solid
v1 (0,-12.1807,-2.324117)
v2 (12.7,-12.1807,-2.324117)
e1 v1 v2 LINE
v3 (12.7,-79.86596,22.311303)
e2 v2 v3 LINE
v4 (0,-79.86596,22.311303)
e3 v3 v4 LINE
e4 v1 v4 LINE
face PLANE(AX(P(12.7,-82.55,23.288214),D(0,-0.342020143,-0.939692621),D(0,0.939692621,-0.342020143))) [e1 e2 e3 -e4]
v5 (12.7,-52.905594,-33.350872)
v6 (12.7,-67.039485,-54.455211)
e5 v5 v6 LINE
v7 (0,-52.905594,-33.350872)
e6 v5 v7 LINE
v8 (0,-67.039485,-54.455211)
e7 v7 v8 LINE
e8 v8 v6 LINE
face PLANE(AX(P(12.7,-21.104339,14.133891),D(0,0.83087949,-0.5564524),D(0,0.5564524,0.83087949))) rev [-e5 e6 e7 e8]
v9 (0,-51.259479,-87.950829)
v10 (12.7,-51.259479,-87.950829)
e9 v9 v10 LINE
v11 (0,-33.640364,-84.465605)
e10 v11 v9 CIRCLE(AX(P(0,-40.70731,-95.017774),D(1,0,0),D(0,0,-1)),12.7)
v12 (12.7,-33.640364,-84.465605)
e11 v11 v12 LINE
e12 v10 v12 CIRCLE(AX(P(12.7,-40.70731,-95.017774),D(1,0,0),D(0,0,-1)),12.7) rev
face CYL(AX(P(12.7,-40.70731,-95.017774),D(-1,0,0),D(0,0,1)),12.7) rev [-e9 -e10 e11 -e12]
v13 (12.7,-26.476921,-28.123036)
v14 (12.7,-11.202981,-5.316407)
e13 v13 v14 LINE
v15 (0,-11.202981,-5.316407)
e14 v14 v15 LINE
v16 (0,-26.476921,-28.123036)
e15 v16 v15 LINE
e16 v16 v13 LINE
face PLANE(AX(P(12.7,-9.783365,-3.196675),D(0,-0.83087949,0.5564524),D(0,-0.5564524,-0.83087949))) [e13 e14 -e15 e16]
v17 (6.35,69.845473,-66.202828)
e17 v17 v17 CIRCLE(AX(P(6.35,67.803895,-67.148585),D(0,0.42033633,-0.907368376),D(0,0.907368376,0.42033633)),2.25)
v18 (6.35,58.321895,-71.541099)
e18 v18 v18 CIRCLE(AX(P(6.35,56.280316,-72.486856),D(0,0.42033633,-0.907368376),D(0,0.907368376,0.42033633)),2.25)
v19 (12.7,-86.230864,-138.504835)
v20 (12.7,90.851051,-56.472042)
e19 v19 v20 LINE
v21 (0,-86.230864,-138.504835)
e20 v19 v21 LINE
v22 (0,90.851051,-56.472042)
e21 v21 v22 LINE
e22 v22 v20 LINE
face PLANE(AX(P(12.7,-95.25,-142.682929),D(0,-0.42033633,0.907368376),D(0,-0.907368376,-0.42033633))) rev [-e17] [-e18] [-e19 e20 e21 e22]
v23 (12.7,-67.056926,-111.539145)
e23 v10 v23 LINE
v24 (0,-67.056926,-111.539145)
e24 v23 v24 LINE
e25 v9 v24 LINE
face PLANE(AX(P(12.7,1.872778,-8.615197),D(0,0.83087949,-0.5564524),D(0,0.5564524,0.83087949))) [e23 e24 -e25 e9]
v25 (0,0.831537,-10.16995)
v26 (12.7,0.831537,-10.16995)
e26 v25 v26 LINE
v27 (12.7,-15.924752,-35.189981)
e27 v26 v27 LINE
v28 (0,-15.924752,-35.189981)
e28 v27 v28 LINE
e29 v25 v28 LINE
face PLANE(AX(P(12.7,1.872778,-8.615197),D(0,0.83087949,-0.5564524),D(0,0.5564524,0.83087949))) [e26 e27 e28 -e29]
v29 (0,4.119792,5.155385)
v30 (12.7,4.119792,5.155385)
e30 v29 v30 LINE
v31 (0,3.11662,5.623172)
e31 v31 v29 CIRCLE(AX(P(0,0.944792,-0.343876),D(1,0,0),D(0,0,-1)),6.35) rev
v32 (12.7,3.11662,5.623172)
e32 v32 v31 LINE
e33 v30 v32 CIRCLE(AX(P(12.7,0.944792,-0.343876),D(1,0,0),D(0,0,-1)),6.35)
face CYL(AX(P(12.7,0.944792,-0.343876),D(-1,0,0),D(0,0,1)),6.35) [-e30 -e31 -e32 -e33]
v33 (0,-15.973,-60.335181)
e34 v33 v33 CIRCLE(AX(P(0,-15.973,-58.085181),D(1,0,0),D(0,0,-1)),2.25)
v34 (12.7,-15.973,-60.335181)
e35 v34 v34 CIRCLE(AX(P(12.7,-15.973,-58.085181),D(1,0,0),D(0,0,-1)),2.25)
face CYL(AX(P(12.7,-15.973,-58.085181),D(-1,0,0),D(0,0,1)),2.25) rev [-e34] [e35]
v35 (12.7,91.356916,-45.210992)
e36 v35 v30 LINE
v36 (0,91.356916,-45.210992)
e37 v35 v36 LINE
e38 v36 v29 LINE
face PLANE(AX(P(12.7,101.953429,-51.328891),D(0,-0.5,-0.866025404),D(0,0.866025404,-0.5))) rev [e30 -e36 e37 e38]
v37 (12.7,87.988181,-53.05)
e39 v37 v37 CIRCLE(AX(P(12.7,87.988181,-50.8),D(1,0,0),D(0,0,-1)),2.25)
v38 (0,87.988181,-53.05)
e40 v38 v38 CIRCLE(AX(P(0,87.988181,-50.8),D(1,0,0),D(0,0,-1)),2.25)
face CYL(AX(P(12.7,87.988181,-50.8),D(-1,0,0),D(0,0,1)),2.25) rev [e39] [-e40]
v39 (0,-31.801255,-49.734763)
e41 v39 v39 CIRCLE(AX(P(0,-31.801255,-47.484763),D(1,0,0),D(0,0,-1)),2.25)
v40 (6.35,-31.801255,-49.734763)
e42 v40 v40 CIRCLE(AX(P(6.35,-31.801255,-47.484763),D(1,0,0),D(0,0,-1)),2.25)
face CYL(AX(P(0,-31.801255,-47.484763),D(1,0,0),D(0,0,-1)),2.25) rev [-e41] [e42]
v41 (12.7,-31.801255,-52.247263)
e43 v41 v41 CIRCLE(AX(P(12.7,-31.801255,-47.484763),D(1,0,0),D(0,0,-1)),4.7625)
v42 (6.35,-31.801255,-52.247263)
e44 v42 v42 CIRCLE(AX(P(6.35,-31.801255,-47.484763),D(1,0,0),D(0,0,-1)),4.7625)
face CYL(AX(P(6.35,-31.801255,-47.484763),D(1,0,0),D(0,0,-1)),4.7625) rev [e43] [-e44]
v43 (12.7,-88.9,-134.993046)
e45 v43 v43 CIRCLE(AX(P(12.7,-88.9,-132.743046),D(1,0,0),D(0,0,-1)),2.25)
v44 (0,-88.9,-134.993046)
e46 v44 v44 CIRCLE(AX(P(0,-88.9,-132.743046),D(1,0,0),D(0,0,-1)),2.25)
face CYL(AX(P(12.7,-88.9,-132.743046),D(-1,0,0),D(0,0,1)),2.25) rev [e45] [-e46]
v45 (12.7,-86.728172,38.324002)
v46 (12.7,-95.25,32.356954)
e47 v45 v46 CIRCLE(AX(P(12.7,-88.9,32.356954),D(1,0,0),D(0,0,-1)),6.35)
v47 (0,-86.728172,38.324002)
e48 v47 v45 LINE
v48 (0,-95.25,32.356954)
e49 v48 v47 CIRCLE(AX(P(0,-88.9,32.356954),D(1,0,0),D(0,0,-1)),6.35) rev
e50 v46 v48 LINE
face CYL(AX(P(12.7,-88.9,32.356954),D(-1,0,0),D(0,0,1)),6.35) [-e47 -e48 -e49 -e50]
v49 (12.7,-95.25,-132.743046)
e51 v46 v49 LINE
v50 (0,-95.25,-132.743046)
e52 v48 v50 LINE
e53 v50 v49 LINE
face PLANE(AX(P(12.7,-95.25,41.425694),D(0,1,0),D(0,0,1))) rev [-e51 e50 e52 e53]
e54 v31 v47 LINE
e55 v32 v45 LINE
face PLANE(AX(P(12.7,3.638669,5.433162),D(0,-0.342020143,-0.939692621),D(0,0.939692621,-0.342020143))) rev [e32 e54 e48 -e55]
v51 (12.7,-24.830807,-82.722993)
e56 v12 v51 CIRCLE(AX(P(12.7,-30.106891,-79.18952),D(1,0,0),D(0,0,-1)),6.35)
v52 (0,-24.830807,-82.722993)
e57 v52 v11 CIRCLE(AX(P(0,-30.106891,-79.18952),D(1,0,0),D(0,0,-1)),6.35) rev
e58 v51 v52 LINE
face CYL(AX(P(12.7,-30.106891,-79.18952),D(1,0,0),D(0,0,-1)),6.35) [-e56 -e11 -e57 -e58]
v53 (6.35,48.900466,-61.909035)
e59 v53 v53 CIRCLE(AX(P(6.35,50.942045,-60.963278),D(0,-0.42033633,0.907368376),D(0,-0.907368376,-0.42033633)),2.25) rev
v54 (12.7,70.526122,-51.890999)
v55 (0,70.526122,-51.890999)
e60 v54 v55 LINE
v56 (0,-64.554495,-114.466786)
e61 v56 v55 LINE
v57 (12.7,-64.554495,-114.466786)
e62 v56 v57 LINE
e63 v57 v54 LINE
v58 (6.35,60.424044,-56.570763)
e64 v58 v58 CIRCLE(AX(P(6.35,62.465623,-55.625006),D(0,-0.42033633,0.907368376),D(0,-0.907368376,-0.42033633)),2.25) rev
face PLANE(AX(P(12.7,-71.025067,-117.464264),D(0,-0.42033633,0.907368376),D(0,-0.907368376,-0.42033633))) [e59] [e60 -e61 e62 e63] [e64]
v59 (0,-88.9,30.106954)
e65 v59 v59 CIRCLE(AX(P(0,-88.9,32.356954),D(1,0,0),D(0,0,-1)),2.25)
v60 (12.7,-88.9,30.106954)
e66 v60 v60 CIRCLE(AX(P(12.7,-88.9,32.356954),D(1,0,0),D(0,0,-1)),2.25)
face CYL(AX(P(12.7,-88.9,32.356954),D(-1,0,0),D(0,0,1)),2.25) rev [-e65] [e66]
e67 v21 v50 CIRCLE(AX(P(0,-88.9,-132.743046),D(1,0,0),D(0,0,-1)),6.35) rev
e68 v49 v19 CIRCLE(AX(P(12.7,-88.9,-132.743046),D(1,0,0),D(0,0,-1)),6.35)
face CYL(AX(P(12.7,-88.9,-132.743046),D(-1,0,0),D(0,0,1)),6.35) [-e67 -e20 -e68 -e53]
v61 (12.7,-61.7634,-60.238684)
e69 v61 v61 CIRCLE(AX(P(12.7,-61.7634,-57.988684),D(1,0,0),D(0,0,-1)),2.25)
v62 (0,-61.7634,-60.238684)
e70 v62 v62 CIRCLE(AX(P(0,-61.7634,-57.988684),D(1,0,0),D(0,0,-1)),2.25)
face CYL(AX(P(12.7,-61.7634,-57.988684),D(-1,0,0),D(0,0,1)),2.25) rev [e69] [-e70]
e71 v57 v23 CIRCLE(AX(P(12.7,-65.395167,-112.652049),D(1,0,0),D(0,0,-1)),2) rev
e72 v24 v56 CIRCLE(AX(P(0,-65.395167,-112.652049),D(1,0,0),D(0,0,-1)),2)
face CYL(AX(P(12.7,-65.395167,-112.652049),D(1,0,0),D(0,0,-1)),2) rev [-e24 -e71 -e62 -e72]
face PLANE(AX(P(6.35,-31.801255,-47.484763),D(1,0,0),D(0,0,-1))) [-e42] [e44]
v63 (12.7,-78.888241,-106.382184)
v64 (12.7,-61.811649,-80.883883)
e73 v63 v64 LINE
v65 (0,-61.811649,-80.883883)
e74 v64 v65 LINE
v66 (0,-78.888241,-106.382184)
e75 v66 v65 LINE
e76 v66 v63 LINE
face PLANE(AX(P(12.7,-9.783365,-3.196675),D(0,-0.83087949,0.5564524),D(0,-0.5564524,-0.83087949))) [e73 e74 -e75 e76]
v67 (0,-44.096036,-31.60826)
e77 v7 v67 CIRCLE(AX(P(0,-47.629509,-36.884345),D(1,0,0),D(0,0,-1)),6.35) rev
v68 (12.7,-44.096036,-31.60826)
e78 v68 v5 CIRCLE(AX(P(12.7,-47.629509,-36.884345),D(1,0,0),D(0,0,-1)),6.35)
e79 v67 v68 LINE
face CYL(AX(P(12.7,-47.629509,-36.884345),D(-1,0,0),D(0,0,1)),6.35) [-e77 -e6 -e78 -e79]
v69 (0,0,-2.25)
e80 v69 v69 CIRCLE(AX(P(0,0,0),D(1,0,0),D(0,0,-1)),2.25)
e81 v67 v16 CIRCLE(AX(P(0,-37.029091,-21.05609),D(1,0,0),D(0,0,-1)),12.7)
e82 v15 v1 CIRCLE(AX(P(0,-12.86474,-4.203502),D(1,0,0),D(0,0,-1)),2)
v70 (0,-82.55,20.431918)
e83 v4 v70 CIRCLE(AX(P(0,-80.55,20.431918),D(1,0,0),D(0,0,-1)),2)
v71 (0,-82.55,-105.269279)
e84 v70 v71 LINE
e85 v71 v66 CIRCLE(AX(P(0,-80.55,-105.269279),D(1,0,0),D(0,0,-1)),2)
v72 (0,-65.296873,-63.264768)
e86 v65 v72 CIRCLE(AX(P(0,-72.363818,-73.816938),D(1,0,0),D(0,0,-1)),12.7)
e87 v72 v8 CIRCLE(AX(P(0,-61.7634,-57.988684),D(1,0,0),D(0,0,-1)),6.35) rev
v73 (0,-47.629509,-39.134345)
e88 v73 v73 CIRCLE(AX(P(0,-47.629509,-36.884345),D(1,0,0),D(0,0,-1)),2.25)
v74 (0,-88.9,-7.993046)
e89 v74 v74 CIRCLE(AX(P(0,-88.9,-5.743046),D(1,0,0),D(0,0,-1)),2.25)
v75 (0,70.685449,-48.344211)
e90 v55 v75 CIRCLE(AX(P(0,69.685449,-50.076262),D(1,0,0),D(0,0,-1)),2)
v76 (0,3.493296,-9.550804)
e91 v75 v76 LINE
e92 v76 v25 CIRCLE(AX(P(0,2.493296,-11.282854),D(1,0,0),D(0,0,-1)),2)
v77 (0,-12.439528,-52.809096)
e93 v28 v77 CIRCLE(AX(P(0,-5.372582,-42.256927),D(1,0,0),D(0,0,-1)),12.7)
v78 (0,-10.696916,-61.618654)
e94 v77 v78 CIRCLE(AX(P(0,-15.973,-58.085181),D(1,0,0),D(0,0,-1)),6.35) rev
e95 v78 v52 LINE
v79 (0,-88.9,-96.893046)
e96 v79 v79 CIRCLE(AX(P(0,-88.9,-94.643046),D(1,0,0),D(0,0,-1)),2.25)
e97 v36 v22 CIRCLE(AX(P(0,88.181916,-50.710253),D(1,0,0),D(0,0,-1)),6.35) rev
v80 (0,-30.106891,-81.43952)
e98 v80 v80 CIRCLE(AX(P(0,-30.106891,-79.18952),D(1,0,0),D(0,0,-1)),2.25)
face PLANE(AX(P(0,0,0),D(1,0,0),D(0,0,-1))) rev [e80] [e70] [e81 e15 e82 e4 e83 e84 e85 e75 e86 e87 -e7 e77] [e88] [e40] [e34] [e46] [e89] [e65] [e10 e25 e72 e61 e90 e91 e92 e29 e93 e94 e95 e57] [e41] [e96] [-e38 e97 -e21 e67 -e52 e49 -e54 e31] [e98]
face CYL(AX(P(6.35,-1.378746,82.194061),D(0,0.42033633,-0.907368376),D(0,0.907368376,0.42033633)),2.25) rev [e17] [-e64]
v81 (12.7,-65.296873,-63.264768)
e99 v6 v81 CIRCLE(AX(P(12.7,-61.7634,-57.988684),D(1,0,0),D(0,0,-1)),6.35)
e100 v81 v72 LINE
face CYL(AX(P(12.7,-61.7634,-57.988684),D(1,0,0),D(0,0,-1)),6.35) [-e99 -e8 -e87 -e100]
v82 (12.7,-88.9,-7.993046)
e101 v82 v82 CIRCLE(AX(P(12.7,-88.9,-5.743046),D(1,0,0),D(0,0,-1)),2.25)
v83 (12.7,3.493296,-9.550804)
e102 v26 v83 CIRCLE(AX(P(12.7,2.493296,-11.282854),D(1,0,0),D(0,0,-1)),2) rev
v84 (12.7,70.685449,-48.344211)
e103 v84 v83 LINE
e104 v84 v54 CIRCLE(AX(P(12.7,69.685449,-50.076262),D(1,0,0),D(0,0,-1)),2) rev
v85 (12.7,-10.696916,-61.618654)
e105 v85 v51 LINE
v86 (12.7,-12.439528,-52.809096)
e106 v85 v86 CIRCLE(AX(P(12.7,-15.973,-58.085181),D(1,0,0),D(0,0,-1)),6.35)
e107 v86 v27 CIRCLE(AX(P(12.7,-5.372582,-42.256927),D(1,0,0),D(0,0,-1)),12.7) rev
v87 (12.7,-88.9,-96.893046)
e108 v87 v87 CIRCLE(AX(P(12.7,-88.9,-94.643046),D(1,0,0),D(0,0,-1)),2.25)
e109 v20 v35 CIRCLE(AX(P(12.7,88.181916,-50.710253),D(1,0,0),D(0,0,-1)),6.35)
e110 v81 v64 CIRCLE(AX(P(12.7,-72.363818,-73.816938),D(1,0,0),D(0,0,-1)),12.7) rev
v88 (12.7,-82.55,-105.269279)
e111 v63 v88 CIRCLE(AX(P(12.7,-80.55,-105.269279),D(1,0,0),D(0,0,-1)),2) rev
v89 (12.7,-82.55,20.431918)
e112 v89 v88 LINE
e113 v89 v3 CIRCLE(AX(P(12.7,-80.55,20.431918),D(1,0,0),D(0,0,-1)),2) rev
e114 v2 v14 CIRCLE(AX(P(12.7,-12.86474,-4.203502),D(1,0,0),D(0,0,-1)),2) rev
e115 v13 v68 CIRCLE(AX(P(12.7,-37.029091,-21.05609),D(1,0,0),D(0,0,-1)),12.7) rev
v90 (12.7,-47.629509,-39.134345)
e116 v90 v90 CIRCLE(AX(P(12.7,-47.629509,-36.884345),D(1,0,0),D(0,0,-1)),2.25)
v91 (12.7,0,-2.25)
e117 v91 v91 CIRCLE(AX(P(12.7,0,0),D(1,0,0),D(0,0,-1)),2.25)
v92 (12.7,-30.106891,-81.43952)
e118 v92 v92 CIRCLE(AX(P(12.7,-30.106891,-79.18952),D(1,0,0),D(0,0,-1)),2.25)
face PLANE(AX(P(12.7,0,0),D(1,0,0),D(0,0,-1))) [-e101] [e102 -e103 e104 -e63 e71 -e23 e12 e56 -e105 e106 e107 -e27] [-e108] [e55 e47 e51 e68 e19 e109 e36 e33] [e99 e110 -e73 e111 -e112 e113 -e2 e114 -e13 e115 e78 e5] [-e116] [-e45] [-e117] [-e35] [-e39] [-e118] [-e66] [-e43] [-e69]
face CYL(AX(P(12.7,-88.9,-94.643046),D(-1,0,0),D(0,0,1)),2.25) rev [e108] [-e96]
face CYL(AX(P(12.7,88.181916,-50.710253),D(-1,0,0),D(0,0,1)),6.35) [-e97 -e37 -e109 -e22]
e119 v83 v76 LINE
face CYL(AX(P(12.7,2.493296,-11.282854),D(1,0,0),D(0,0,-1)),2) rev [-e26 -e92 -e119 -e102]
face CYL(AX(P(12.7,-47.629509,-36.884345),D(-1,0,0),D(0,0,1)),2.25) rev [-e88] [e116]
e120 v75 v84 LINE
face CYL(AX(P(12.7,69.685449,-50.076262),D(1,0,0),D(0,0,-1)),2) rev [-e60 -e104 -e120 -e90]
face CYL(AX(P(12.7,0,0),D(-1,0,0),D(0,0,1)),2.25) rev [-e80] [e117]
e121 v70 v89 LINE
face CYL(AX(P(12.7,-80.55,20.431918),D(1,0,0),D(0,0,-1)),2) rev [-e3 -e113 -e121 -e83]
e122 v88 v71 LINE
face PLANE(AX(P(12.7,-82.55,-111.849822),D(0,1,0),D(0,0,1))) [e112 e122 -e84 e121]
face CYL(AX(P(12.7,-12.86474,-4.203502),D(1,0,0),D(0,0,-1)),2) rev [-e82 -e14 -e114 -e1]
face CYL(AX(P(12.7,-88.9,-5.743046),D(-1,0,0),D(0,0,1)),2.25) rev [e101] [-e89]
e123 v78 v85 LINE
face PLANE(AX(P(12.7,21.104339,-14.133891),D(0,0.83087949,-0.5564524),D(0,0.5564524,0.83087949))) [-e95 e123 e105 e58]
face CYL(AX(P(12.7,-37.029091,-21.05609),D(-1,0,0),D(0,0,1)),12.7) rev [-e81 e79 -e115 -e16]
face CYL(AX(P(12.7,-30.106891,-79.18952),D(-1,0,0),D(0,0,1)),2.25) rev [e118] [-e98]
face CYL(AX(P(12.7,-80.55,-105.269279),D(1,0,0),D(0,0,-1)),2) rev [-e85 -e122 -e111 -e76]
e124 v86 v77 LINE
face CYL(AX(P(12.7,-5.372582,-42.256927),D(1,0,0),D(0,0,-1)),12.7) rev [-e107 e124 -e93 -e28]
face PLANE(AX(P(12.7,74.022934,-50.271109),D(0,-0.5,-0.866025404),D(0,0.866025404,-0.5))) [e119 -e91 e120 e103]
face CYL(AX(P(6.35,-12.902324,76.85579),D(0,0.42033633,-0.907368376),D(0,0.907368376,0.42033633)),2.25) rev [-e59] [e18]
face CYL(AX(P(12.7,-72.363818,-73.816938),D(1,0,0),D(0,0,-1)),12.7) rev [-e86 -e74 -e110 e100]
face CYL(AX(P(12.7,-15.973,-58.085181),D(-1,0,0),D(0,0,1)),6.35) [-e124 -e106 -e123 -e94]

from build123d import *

# Parameters (mm, degrees)
SKETCH2_R           = 2.25
BOSS_EXTRUDE1_DEPTH = 12.7
FILLET1_R           = 6.35
FILLET2_R           = 2
CUT_EXTRUDE2_START  = 12.7
SKETCH3_R           = 4.7625
SKETCH3_R_2         = 2.25
CUT_EXTRUDE2_DEPTH  = 6.35
SKETCH3_3_R         = 2.25
BOSS_EXTRUDE2_DEPTH = 12.7
FILLET3_R           = 6.35
CUT_EXTRUDE3_REACH  = 181.366
SKETCH4_R           = 2.25
CUT_EXTRUDE4_START  = 12.7
SKETCH3_4_R         = 2.25
CUT_EXTRUDE4_DEPTH  = 182.75835677
FILLET4_R           = 12.7


with BuildPart() as part:
    # Sketch2 → Boss-Extrude1 (new body)
    with BuildSketch(Plane(origin=(0, 0, 0), x_dir=(0, 0, -1), z_dir=(1, 0, 0))):
        Polygon((-41.425693669, -95.25), (142.682929389, -95.25), (51.328891162, 101.953428549), (-5.433161507, 3.638669384), align=None)
        Circle(SKETCH2_R, mode=Mode.SUBTRACT)
        with Locations((50.8, 87.988181024)):
            Circle(SKETCH2_R, mode=Mode.SUBTRACT)
        with Locations((-32.356953826, -88.9)):
            Circle(SKETCH2_R, mode=Mode.SUBTRACT)
        with Locations((132.743046174, -88.9)):
            Circle(SKETCH2_R, mode=Mode.SUBTRACT)
        with Locations((5.743046174, -88.9)):
            Circle(SKETCH2_R, mode=Mode.SUBTRACT)
        with Locations((94.643046174, -88.9)):
            Circle(SKETCH2_R, mode=Mode.SUBTRACT)
        Polygon((-23.288213983, -82.55), (3.196675109, -9.783365262), (111.849821959, -82.55), align=None, mode=Mode.SUBTRACT)
        Polygon((8.615197161, 1.87277804), (117.46426423, -71.025067394), (50.271108838, 74.0229335), align=None, mode=Mode.SUBTRACT)
    extrude(amount=BOSS_EXTRUDE1_DEPTH)

    # Fillet1
    fillet1_edges = [part.edges().sort_by_distance(p)[0] for p in [
        (6.35, 3.638669384, 5.433161507),
        (6.35, 101.953428549, -51.328891162),
        (6.35, -95.25, -142.682929389),
        (6.35, -95.25, 41.425693669),
    ]]
    fillet(fillet1_edges, radius=FILLET1_R)

    # Fillet2
    fillet2_edges = [part.edges().sort_by_distance(p)[0] for p in [
        (6.35, -82.55, 23.288213983),
        (6.35, -82.55, -111.849821959),
        (6.35, -9.783365262, -3.196675109),
        (6.35, 74.0229335, -50.271108838),
        (6.35, 1.87277804, -8.615197161),
        (6.35, -71.025067394, -117.46426423),
    ]]
    fillet(fillet2_edges, radius=FILLET2_R)

    # Sketch3 → Cut-Extrude2 (cut)
    with BuildSketch(Plane(origin=(0, 0, 0), x_dir=(0, 0, -1), z_dir=(1, 0, 0)).offset(CUT_EXTRUDE2_START)):
        with Locations((47.484762838, -31.801254664)):
            Circle(SKETCH3_R)
        with Locations((47.484762838, -31.801254664)):
            Circle(SKETCH3_R_2, mode=Mode.SUBTRACT)
    extrude(amount=-CUT_EXTRUDE2_DEPTH, mode=Mode.SUBTRACT)

    # Sketch3<3> → Boss-Extrude2 (add)
    # profile 1 of 2: a face of its own
    with BuildSketch(Plane(origin=(0, 0, 0), x_dir=(0, 0, -1), z_dir=(1, 0, 0))):
        Polygon((56.34256904, -7.163442885), (45.742150819, -22.991697164), (77.398659377, -44.192533607), (87.999077599, -28.364279328), align=None)
        with Locations((79.189520098, -30.106891347)):
            Circle(SKETCH3_3_R, mode=Mode.SUBTRACT)
        with Locations((58.085181059, -15.973000385)):
            Circle(SKETCH3_3_R, mode=Mode.SUBTRACT)
    # profile 2 of 2: a face of its own
    with BuildSketch(Plane(origin=(0, 0, 0), x_dir=(0, 0, -1), z_dir=(1, 0, 0))):
        Polygon((59.731295675, -70.572957406), (70.331713896, -54.744703127), (38.675205338, -33.543866684), (28.074787116, -49.372120963), align=None)
        with Locations((57.988683656, -61.763399906)):
            Circle(SKETCH3_3_R, mode=Mode.SUBTRACT)
        with Locations((36.884344616, -47.629508944)):
            Circle(SKETCH3_3_R, mode=Mode.SUBTRACT)
    extrude(amount=BOSS_EXTRUDE2_DEPTH)

    # Fillet3
    fillet3_edges = [part.edges().sort_by_distance(p)[0] for p in [
        (6.35, -28.364279328, -87.999077599),
        (6.35, -7.163442885, -56.34256904),
        (6.35, -49.372120963, -28.074787116),
        (6.35, -70.572957406, -59.731295675),
    ]]
    fillet(fillet3_edges, radius=FILLET3_R)

    # Sketch4 → Cut-Extrude3 (cut, up to next)
    with BuildSketch(Plane(origin=(0, 37.590233469, -81.144994396), x_dir=(-1, 0, 0), z_dir=(0, 0.4203363295122345, -0.9073683761803595)), mode=Mode.PRIVATE) as cut_extrude3_sk1:
        with Locations(Location((-6.35, 20.598120023, 0), (0, 0, 90))):
            Circle(SKETCH4_R)
    cut_extrude3_tool1 = extrude(cut_extrude3_sk1.sketch, amount=-CUT_EXTRUDE3_REACH, mode=Mode.PRIVATE) & part.part
    # Sketch4 → Cut-Extrude3 (cut, up to next)
    with BuildSketch(Plane(origin=(0, 37.590233469, -81.144994396), x_dir=(-1, 0, 0), z_dir=(0, 0.4203363295122345, -0.9073683761803595)), mode=Mode.PRIVATE) as cut_extrude3_sk2:
        with Locations(Location((-6.35, 33.298120023, 0), (0, 0, 90))):
            Circle(SKETCH4_R)
    cut_extrude3_tool2 = extrude(cut_extrude3_sk2.sketch, amount=-CUT_EXTRUDE3_REACH, mode=Mode.PRIVATE) & part.part
    add(cut_extrude3_tool1.solids().sort_by_distance((6.35, 56.280316, -72.486856))[0], mode=Mode.SUBTRACT)
    add(cut_extrude3_tool2.solids().sort_by_distance((6.35, 67.803895, -67.148585))[0], mode=Mode.SUBTRACT)

    # Sketch3<4> → Cut-Extrude4 (cut, through all)
    with BuildSketch(Plane(origin=(0, 0, 0), x_dir=(0, 0, -1), z_dir=(1, 0, 0)).offset(CUT_EXTRUDE4_START)):
        with Locations((47.484762838, -31.801254664)):
            Circle(SKETCH3_4_R)
    extrude(amount=-CUT_EXTRUDE4_DEPTH, mode=Mode.SUBTRACT)

    # Fillet4
    fillet4_edges = [part.edges().sort_by_distance(p)[0] for p in [
        (6.35, -44.192533607, -77.398659377),
        (6.35, -54.744703127, -70.331713896),
        (6.35, -22.991697164, -45.742150819),
        (6.35, -33.543866684, -38.675205338),
    ]]
    fillet(fillet4_edges, radius=FILLET4_R - 0.0001)  # a hair under: the kernel refuses the full size


solid = part.part
